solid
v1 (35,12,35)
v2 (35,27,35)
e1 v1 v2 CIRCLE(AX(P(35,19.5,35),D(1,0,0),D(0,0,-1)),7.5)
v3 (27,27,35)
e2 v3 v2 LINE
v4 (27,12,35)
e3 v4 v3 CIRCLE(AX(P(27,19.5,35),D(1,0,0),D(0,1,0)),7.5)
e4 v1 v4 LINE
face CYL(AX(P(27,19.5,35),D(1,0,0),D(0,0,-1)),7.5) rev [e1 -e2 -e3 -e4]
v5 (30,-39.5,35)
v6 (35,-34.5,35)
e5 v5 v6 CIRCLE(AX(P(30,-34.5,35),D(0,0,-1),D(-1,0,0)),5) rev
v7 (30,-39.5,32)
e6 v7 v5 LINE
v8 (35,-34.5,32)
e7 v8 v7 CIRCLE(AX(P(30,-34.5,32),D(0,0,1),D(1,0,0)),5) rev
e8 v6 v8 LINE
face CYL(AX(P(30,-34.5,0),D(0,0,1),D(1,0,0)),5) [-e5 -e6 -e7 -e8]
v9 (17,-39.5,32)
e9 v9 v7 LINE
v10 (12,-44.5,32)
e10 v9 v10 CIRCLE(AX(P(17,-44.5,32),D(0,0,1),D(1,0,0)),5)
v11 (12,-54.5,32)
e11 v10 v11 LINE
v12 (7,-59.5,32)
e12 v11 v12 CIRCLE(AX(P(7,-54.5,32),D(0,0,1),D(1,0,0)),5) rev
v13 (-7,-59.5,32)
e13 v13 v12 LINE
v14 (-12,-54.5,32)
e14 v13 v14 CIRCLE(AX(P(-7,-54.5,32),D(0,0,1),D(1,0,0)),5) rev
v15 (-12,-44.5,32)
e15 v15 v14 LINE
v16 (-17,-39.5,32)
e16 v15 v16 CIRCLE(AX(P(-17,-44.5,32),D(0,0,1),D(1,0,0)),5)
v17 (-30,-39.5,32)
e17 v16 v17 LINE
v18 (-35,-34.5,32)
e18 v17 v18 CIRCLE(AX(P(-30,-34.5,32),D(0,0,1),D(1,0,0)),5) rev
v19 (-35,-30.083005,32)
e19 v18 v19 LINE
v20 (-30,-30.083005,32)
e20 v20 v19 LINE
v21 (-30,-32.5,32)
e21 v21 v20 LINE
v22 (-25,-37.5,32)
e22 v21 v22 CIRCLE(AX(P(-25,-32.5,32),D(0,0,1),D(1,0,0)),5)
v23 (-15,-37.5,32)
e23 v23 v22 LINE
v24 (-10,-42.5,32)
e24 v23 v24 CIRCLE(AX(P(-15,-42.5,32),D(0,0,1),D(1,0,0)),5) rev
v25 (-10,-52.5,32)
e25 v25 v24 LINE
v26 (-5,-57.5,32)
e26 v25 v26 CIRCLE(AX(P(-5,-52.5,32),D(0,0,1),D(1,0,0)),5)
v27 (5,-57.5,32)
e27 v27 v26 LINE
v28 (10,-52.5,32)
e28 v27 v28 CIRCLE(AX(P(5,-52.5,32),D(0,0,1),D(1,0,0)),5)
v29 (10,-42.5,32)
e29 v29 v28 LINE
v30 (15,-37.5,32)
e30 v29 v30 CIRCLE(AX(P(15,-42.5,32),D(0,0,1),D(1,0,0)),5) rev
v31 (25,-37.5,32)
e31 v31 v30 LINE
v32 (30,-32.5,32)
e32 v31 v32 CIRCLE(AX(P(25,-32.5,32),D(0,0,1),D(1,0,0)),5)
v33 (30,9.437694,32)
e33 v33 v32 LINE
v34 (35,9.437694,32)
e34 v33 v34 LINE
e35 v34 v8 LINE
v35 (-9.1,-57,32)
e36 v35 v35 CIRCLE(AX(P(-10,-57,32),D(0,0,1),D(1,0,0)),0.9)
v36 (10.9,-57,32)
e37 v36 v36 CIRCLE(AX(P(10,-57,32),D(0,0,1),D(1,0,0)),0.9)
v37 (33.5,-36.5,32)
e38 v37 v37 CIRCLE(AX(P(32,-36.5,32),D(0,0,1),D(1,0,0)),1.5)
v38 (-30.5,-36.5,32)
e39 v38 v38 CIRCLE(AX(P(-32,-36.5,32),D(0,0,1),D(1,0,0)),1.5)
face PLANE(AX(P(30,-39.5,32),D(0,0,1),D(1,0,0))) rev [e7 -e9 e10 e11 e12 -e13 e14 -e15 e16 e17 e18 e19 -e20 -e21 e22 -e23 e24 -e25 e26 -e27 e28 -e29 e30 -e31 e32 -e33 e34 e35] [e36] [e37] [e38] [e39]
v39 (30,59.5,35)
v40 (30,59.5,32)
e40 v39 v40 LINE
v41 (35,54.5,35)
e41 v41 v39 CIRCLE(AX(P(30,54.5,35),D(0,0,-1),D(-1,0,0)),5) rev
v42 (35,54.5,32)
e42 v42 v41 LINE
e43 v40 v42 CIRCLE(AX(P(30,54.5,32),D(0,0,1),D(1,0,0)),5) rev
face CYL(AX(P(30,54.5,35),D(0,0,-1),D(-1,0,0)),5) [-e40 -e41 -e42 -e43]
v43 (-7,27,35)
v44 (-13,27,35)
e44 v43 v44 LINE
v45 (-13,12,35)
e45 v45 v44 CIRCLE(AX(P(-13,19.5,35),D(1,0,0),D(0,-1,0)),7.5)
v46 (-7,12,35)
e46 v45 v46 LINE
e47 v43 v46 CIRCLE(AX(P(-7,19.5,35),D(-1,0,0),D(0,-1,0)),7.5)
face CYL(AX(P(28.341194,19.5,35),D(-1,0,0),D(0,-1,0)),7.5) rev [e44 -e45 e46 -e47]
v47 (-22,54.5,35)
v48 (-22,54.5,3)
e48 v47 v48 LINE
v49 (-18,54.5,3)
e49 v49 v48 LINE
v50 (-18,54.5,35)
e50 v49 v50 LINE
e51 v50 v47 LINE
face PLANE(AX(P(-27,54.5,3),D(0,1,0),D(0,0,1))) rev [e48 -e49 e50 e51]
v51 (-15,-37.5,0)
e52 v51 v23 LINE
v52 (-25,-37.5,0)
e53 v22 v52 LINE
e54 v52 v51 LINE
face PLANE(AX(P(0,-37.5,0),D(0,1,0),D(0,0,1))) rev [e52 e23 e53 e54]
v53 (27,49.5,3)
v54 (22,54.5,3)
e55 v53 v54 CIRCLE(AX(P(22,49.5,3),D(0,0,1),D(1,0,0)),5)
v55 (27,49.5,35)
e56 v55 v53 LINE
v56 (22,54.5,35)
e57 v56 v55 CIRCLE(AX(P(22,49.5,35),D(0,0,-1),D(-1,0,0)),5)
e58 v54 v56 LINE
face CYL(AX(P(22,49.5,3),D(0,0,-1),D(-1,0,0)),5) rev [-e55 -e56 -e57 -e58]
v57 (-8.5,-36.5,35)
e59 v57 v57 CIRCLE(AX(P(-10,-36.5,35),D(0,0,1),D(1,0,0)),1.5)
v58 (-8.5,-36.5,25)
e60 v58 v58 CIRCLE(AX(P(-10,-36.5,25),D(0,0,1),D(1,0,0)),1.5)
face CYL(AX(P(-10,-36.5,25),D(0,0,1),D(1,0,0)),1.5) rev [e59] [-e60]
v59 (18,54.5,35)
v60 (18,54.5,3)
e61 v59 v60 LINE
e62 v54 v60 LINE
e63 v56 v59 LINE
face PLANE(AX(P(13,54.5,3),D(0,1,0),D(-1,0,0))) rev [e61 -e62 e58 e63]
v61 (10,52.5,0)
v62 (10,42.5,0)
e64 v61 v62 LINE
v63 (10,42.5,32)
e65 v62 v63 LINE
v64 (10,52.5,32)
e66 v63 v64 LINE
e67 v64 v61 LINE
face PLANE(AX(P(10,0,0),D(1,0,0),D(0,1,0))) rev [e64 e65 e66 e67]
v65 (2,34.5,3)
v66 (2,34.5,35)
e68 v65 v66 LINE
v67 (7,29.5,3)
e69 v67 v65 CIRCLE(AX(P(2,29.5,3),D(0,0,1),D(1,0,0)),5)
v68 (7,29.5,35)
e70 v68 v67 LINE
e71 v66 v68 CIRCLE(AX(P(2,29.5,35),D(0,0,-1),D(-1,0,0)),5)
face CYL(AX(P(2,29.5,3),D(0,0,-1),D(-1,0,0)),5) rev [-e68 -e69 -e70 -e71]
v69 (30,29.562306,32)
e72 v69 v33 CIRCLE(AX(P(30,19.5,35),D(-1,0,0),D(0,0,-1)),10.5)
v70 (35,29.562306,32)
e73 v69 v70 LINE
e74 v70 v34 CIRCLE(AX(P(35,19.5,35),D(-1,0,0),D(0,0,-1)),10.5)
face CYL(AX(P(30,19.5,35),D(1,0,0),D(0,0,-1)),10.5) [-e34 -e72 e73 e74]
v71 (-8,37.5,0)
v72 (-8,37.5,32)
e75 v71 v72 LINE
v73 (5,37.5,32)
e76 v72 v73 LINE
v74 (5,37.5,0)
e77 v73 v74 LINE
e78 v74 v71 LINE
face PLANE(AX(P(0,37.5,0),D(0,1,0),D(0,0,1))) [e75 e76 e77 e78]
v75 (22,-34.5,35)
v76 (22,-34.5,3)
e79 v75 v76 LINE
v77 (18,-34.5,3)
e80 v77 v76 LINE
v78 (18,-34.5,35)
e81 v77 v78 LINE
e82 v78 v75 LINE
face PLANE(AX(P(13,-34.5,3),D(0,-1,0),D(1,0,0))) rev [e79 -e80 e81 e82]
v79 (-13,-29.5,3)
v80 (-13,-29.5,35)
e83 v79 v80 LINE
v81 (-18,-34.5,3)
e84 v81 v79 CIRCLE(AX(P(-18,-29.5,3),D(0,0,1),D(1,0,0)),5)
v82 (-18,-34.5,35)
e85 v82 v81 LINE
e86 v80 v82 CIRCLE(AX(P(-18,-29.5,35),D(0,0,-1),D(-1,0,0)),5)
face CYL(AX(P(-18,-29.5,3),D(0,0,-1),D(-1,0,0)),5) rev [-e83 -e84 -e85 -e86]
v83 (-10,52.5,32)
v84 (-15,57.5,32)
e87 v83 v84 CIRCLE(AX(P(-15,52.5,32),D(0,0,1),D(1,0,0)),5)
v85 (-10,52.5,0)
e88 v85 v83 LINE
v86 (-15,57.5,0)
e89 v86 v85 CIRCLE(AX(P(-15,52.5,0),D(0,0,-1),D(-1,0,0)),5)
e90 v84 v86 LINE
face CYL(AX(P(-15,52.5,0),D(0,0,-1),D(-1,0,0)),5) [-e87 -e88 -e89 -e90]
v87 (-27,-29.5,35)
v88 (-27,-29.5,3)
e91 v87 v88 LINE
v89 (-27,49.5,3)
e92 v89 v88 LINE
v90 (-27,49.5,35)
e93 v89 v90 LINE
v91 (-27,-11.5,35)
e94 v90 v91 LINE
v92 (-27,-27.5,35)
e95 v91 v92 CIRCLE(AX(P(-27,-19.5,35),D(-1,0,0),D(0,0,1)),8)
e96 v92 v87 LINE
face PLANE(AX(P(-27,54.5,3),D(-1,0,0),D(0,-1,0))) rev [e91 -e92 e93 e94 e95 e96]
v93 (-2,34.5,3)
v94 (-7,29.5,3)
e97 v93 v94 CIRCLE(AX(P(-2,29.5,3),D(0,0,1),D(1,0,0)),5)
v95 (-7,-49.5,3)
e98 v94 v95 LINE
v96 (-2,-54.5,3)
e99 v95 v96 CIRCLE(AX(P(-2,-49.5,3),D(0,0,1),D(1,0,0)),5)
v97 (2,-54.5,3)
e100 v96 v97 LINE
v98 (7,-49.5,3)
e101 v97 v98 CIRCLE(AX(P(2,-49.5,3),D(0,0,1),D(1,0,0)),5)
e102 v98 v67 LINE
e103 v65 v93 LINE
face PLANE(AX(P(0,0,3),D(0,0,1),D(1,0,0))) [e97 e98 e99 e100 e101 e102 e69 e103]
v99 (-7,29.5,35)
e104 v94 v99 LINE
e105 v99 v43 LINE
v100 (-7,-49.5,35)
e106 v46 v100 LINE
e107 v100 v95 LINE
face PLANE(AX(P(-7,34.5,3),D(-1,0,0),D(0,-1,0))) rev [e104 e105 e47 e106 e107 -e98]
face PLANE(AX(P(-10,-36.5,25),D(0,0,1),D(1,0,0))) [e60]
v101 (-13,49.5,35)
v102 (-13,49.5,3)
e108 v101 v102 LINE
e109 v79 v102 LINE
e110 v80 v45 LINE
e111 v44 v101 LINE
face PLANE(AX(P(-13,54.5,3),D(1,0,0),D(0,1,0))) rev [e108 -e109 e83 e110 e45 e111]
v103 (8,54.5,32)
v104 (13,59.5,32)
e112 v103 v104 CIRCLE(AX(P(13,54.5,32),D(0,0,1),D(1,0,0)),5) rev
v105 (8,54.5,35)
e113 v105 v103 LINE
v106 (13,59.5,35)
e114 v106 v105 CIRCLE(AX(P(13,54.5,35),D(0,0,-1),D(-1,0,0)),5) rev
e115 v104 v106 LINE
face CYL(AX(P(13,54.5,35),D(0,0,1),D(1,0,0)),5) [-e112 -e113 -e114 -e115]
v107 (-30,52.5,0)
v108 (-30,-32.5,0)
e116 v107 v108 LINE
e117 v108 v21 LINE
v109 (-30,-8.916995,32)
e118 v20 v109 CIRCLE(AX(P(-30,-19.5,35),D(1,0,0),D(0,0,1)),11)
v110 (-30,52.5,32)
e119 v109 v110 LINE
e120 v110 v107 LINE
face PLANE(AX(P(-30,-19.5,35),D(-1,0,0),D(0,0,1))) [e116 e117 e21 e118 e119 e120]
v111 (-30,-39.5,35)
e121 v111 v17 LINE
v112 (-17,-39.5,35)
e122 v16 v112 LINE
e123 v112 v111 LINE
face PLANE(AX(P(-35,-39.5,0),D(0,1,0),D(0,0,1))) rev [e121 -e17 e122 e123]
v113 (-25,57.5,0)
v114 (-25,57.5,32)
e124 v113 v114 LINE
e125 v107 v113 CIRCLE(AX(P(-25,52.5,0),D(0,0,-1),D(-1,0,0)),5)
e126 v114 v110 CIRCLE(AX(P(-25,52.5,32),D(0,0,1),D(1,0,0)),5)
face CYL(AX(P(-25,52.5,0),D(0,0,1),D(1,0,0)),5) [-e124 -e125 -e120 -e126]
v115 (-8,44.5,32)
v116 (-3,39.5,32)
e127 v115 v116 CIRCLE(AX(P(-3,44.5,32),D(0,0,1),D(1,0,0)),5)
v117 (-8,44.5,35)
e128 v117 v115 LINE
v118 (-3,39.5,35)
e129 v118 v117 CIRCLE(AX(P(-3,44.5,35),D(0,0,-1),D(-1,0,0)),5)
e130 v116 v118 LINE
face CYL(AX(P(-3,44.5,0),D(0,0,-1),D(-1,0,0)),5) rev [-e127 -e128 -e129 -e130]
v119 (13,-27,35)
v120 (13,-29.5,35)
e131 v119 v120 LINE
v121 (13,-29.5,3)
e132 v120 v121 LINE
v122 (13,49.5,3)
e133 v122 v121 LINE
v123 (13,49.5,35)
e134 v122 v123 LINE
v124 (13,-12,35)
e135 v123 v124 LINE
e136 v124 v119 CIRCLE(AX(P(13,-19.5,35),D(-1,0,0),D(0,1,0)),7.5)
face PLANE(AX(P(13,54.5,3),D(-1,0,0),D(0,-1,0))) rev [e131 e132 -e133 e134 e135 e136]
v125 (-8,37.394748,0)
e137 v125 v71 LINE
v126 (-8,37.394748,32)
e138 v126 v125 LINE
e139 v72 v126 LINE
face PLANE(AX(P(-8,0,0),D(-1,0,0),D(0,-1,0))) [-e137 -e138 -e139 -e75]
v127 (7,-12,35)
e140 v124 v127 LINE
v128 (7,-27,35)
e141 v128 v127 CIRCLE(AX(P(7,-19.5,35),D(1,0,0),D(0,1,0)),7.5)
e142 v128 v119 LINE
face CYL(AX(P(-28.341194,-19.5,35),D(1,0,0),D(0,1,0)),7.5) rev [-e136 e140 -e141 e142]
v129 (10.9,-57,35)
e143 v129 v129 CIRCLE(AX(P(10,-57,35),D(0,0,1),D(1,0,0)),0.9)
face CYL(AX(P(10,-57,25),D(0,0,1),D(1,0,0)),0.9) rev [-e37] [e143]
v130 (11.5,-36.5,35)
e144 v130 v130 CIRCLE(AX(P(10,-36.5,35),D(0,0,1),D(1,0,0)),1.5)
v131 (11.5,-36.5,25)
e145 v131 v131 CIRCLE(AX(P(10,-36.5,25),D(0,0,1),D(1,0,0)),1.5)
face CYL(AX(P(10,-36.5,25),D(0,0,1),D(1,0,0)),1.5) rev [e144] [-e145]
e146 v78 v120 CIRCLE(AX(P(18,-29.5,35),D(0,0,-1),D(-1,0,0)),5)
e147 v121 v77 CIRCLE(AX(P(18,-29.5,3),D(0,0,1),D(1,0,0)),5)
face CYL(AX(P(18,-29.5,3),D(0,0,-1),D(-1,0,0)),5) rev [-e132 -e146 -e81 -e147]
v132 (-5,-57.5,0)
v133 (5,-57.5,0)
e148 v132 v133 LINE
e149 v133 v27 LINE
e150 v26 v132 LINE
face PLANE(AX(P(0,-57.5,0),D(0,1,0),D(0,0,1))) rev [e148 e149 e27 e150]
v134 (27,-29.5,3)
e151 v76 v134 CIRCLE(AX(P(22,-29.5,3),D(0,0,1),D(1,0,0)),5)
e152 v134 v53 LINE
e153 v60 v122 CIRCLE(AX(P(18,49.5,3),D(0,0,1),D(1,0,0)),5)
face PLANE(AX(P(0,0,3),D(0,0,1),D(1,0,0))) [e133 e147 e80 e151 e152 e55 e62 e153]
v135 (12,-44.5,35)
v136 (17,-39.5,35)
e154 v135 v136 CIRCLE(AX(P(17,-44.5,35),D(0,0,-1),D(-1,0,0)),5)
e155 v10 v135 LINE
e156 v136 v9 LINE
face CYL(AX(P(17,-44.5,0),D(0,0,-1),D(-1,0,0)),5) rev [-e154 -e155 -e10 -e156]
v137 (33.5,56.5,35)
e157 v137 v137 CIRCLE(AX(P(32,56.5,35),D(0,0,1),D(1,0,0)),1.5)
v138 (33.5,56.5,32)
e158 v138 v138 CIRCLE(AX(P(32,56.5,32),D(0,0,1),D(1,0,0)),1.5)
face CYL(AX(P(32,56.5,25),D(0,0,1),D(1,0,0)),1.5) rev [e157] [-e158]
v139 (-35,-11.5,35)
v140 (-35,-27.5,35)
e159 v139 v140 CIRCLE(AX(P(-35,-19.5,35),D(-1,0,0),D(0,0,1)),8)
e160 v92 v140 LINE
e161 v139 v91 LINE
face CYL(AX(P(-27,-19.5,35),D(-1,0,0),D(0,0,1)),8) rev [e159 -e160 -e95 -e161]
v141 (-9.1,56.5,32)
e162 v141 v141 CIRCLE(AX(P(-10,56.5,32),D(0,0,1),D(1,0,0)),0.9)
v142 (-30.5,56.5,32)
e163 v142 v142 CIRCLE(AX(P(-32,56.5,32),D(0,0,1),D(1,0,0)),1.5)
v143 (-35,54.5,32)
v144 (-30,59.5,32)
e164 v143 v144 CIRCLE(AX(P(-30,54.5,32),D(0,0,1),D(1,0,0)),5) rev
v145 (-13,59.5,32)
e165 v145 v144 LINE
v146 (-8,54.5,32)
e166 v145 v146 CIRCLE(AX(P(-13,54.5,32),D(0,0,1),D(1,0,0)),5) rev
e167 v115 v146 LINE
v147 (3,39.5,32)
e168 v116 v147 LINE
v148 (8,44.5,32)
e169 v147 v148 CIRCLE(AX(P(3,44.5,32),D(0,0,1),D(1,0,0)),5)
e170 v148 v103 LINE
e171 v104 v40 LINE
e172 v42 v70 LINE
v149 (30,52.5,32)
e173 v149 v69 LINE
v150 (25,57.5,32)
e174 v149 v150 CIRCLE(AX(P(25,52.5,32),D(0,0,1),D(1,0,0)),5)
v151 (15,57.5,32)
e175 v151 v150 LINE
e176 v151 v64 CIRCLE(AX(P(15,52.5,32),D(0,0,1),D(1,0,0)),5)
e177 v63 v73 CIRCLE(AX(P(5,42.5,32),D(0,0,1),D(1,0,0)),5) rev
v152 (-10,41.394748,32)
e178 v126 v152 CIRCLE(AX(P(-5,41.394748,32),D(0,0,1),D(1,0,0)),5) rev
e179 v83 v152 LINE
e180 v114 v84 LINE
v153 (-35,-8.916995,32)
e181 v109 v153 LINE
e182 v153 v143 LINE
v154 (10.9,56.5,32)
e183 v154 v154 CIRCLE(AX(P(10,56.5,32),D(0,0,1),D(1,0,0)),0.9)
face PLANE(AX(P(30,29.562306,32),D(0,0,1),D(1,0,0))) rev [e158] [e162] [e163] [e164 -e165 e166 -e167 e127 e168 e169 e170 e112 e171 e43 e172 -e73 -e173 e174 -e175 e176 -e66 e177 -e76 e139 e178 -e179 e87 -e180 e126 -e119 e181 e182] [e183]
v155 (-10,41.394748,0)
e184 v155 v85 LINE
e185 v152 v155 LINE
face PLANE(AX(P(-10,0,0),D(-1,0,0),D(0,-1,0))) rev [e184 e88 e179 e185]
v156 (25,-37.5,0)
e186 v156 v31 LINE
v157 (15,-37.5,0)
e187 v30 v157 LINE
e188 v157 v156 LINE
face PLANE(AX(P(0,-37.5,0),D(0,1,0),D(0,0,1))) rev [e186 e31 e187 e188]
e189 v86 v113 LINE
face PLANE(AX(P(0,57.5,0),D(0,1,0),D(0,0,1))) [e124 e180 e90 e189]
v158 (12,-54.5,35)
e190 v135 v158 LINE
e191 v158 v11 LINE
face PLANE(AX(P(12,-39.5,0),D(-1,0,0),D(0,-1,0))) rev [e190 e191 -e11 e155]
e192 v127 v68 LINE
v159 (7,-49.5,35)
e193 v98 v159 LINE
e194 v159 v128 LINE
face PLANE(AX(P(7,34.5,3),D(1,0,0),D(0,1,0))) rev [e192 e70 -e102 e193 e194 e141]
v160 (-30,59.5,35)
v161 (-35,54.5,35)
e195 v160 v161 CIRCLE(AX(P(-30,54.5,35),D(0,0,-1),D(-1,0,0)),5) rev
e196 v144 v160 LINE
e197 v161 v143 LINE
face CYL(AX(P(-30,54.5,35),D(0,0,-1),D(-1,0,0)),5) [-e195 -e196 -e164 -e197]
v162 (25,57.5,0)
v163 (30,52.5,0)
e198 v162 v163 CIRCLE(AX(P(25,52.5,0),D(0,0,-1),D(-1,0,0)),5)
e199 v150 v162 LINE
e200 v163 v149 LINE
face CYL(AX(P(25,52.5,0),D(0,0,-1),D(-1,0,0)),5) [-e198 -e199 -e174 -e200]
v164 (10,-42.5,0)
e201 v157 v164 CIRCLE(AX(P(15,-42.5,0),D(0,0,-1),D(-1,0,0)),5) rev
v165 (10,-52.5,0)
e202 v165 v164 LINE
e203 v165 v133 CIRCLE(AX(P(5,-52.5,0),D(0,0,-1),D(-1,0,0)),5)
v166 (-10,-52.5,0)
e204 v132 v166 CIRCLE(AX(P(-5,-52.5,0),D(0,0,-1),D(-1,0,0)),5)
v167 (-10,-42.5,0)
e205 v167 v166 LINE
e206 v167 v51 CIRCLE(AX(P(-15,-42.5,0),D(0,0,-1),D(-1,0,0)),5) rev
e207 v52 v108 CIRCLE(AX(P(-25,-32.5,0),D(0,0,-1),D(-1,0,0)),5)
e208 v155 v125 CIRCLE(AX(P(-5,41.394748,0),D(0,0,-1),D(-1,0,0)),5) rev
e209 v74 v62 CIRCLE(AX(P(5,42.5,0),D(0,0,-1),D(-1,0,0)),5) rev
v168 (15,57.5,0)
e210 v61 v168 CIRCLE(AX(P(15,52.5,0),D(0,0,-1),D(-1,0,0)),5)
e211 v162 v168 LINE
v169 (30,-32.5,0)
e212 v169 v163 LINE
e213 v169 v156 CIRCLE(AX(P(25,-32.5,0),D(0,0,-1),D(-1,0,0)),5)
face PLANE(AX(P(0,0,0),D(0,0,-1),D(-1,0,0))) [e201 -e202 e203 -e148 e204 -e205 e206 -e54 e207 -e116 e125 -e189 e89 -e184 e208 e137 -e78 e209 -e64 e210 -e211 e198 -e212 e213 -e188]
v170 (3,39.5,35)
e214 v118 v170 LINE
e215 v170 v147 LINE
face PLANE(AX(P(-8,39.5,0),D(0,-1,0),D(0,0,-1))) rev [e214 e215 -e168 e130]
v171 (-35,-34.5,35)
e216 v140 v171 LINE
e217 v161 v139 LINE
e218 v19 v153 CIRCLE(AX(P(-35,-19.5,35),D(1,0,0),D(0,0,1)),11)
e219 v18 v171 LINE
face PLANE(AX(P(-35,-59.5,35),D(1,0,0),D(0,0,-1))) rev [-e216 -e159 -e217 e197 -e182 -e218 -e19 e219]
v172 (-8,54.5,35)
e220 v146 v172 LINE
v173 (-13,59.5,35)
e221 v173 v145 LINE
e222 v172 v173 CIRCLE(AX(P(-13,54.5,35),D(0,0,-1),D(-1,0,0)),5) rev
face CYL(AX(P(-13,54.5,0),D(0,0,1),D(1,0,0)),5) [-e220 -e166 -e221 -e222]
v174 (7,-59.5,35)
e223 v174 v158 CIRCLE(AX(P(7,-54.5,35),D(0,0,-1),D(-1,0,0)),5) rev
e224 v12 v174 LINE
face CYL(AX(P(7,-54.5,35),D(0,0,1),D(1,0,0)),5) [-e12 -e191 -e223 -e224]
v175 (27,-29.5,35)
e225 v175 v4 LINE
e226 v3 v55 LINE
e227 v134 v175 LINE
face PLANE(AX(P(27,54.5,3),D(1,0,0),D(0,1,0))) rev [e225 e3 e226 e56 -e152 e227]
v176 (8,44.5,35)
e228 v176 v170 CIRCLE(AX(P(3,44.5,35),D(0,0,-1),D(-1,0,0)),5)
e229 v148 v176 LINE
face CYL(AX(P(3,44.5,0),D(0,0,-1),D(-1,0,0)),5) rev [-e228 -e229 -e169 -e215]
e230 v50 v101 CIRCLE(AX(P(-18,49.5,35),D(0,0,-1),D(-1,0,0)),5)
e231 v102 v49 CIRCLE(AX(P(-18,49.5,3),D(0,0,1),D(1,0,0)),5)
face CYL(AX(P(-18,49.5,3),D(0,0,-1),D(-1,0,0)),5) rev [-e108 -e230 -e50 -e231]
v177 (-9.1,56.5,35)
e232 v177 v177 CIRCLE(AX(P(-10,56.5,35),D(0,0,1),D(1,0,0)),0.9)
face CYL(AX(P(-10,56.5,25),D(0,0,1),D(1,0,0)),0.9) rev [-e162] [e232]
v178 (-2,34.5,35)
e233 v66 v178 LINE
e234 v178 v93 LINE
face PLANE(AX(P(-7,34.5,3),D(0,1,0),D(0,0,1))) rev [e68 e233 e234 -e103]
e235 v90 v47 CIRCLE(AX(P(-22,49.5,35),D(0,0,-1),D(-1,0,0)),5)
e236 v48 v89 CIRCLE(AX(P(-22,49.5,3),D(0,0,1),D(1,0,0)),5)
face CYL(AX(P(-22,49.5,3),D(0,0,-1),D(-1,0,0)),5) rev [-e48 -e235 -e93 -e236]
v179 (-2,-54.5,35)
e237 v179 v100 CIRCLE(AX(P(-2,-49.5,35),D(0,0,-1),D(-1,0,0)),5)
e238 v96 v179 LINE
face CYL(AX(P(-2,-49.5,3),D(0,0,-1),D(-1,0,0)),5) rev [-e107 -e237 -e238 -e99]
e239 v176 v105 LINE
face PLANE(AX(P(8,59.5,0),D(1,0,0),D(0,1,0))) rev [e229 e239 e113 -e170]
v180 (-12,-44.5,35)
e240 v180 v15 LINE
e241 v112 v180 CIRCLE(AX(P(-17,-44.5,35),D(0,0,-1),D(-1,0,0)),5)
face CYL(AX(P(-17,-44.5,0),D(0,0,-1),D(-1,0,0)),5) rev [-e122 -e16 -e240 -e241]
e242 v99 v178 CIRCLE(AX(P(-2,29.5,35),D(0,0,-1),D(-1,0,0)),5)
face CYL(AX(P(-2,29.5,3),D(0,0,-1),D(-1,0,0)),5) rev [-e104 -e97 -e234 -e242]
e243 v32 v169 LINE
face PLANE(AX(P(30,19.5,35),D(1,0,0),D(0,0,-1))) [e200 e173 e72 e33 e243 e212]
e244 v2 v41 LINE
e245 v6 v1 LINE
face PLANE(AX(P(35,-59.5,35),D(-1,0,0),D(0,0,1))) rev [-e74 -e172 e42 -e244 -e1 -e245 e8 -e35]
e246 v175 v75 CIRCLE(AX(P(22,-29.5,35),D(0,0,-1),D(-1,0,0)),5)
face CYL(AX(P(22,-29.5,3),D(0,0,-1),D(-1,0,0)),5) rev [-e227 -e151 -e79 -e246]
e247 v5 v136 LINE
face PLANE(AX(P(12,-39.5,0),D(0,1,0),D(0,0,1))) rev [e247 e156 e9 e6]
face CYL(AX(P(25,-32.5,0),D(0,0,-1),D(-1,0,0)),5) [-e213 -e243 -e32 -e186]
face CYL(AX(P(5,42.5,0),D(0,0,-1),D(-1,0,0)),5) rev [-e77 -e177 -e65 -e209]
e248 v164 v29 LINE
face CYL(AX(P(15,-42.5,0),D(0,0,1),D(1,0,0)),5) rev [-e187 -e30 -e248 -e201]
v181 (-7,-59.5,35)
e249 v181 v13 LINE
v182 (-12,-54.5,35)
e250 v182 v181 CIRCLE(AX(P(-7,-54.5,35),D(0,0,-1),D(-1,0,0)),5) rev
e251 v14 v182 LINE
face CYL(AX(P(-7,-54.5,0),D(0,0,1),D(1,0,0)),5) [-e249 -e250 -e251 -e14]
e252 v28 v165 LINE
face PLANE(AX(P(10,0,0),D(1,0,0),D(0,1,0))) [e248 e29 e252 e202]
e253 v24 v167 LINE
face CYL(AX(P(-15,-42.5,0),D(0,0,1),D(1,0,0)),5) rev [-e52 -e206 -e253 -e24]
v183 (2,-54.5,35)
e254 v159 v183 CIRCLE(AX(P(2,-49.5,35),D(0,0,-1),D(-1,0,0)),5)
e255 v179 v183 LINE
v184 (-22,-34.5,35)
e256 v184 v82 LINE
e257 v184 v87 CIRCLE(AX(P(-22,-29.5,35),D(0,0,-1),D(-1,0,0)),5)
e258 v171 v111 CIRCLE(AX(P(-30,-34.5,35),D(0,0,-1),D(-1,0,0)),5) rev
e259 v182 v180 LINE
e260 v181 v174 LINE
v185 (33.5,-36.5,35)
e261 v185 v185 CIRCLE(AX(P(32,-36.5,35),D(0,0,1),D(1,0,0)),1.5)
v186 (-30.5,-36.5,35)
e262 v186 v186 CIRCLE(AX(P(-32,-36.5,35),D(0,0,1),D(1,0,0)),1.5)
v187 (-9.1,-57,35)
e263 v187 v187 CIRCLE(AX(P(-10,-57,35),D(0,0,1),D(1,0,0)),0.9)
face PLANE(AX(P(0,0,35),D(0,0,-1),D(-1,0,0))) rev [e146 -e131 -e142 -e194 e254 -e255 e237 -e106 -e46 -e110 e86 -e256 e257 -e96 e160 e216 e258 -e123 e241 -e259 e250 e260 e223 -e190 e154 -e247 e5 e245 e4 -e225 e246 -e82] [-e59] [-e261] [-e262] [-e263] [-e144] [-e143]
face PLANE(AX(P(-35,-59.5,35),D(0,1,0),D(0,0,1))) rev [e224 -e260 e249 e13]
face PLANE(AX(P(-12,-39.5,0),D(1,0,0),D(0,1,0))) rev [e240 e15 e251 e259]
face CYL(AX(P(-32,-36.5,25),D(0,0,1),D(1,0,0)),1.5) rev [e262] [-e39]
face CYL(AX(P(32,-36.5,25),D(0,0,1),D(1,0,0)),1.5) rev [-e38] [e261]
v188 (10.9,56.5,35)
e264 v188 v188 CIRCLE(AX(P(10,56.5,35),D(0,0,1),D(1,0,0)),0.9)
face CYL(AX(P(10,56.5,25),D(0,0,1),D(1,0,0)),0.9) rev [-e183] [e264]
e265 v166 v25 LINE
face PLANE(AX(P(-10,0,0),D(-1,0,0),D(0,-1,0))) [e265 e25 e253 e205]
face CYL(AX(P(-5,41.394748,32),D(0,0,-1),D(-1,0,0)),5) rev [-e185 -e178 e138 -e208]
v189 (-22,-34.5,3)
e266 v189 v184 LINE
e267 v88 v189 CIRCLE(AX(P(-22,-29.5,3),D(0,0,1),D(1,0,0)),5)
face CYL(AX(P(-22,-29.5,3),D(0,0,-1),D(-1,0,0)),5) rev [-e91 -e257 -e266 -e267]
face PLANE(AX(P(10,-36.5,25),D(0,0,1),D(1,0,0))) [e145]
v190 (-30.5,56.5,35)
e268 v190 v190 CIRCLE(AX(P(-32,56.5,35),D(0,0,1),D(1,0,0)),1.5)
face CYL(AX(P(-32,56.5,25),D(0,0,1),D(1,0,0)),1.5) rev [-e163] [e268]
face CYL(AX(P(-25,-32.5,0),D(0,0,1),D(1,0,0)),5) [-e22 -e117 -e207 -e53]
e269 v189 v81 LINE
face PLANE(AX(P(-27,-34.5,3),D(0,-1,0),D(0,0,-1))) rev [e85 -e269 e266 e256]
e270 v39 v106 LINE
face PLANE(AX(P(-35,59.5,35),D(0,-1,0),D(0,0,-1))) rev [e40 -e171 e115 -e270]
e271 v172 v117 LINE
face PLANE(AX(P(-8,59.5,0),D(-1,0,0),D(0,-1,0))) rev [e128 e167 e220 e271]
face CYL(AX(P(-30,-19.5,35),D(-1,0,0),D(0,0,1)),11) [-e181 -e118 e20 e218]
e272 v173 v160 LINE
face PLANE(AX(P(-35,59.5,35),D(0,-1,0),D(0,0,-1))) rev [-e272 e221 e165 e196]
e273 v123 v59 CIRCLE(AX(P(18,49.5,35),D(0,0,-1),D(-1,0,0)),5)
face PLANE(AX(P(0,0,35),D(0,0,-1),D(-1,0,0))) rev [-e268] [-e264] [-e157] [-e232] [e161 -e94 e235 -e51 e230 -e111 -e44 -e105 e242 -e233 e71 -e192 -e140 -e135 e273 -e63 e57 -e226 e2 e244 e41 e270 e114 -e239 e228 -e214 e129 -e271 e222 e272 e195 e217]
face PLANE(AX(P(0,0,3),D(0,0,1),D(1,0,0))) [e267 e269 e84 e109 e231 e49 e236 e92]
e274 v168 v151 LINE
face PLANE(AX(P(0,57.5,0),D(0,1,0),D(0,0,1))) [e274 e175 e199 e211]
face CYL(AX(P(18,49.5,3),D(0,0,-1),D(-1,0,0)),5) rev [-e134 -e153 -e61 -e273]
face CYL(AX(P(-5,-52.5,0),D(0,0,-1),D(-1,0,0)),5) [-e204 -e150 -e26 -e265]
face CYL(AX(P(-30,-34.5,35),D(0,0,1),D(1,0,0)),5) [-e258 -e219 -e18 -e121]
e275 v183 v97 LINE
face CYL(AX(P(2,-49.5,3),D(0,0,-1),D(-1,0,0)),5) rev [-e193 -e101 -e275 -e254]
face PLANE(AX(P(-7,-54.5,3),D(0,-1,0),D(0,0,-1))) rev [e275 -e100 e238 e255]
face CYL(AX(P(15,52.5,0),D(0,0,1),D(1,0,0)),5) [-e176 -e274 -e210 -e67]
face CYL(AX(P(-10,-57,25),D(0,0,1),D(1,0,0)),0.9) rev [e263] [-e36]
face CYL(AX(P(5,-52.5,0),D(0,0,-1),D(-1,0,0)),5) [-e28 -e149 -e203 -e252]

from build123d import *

# Parameters (mm, degrees)
SKETCH1_W           = 70
SKETCH1_H           = 119
BOSS_EXTRUDE1_DEPTH = 35
SKETCH2_R           = 8
CUT_EXTRUDE1_DEPTH  = 8
CUT_EXTRUDE2_DEPTH  = 32
SKETCH4_R           = 7.5
CUT_EXTRUDE3_DEPTH  = 8
SKETCH5_W           = 16
SKETCH5_H           = 20
SKETCH5_W_2         = 23
CUT_EXTRUDE4_DEPTH  = 78.396705356
CUT_EXTRUDE5_DEPTH  = 5
SKETCH7_W           = 18
SKETCH7_H           = 32
CUT_EXTRUDE6_DEPTH  = 2
SKETCH8_W           = 32
SKETCH8_H           = 22
CUT_EXTRUDE7_DEPTH  = 2
SKETCH9_W           = 22
SKETCH9_H           = 32
CUT_EXTRUDE8_DEPTH  = 2
SKETCH10_W          = 32
SKETCH10_H          = 18
CUT_EXTRUDE9_DEPTH  = 2
CUT_EXTRUDE11_DEPTH = 5
SKETCH13_W          = 20
SKETCH13_H          = 32
CUT_EXTRUDE12_DEPTH = 2
SKETCH14_W          = 22
SKETCH14_H          = 32
CUT_EXTRUDE13_DEPTH = 2
SKETCH15_W          = 32
SKETCH15_H          = 18
CUT_EXTRUDE14_DEPTH = 2
SKETCH16_W          = 18
SKETCH16_H          = 32
CUT_EXTRUDE15_DEPTH = 2
SKETCH17_W          = 32
SKETCH17_H          = 20.10525169
CUT_EXTRUDE16_DEPTH = 2
FILLET1_R           = 5
FILLET3_R           = 5
FILLET4_R           = 5
SKETCH18_R          = 1.5
CUT_EXTRUDE17_DEPTH = 10
SKETCH19_R          = 0.9
CUT_EXTRUDE18_DEPTH = 10
BOSS_EXTRUDE3_DEPTH = 6
BOSS_EXTRUDE4_START = -6
BOSS_EXTRUDE4_DEPTH = 6


with BuildPart() as part:
    # Sketch1 → Boss-Extrude1 (new body)
    with BuildSketch(Plane.XY):
        Rectangle(SKETCH1_W, SKETCH1_H)
    extrude(amount=BOSS_EXTRUDE1_DEPTH)

    # Sketch2 → Cut-Extrude1 (cut)
    with BuildSketch(Plane.ZY.offset(35)):
        with Locations((35, -19.5)):
            Circle(SKETCH2_R)
    extrude(amount=-CUT_EXTRUDE1_DEPTH, mode=Mode.SUBTRACT)

    # Sketch3 → Cut-Extrude2 (cut)
    with BuildSketch(Plane.XY.offset(35)):
        Polygon((-27, 54.5), (-13, 54.5), (-13, 27), (-7, 27), (-7, 34.5), (7, 34.5), (7, -12), (13, -12), (13, 54.5), (27, 54.5), (27, -34.5), (13, -34.5), (13, -27), (7, -27), (7, -54.5), (-7, -54.5), (-7, 12), (-13, 12), (-13, -34.5), (-27, -34.5), align=None)
    extrude(amount=-CUT_EXTRUDE2_DEPTH, mode=Mode.SUBTRACT)

    # Sketch4 → Cut-Extrude3 (cut)
    with BuildSketch(Plane(origin=(35, 0, 0), x_dir=(0, 0, -1), z_dir=(1, 0, 0))):
        with Locations((-35, 19.5)):
            Circle(SKETCH4_R)
    extrude(amount=-CUT_EXTRUDE3_DEPTH, mode=Mode.SUBTRACT)

    # Sketch5 → Cut-Extrude4 (cut, through all)
    with BuildSketch(Plane.XY.offset(35)):
        with Locations((0, 49.5)):
            Rectangle(SKETCH5_W, SKETCH5_H)
        with Locations((23.5, -49.5)):
            Rectangle(SKETCH5_W_2, SKETCH5_H)
        with Locations((-23.5, -49.5)):
            Rectangle(SKETCH5_W_2, SKETCH5_H)
    extrude(amount=-CUT_EXTRUDE4_DEPTH, mode=Mode.SUBTRACT)

    # Sketch6 → Cut-Extrude5 (cut)
    with BuildSketch(Plane(origin=(35, 0, 0), x_dir=(0, 0, -1), z_dir=(1, 0, 0))):
        with BuildLine():
            Line((-32, 59.5), (0, 59.5))
            Line((0, 59.5), (0, -39.5))
            Line((0, -39.5), (-32, -39.5))
            Line((-32, -39.5), (-32, 9.437694101))
            ThreePointArc((-32, 9.437694101), (-24.5, 19.5), (-32, 29.562305899))
            Line((-32, 29.562305899), (-32, 59.5))
        make_face()
    extrude(amount=-CUT_EXTRUDE5_DEPTH, mode=Mode.SUBTRACT)

    # Sketch7 → Cut-Extrude6 (cut)
    with BuildSketch(Plane.XZ.offset(39.5)):
        with Locations((21, 16)):
            Rectangle(SKETCH7_W, SKETCH7_H)
    extrude(amount=-CUT_EXTRUDE6_DEPTH, mode=Mode.SUBTRACT)

    # Sketch8 → Cut-Extrude7 (cut)
    with BuildSketch(Plane(origin=(12, 0, 0), x_dir=(0, 0, -1), z_dir=(1, 0, 0))):
        with Locations((-16, -48.5)):
            Rectangle(SKETCH8_W, SKETCH8_H)
    extrude(amount=-CUT_EXTRUDE7_DEPTH, mode=Mode.SUBTRACT)

    # Sketch9 → Cut-Extrude8 (cut)
    with BuildSketch(Plane.XZ.offset(59.5)):
        with Locations((-1, 16)):
            Rectangle(SKETCH9_W, SKETCH9_H)
    extrude(amount=-CUT_EXTRUDE8_DEPTH, mode=Mode.SUBTRACT)

    # Sketch10 → Cut-Extrude9 (cut)
    with BuildSketch(Plane.ZY.offset(12)):
        with Locations((16, -48.5)):
            Rectangle(SKETCH10_W, SKETCH10_H)
    extrude(amount=-CUT_EXTRUDE9_DEPTH, mode=Mode.SUBTRACT)

    # Sketch12 → Cut-Extrude11 (cut)
    with BuildSketch(Plane.ZY.offset(35)):
        with BuildLine():
            Line((32, 59.5), (0, 59.5))
            Line((0, 59.5), (0, -39.5))
            Line((0, -39.5), (32, -39.5))
            Line((32, -39.5), (32, -30.083005244))
            ThreePointArc((32, -30.083005244), (24, -19.5), (32, -8.916994756))
            Line((32, -8.916994756), (32, 59.5))
        make_face()
    extrude(amount=-CUT_EXTRUDE11_DEPTH, mode=Mode.SUBTRACT)

    # Sketch13 → Cut-Extrude12 (cut)
    with BuildSketch(Plane.XZ.offset(39.5)):
        with Locations((-20, 16)):
            Rectangle(SKETCH13_W, SKETCH13_H)
    extrude(amount=-CUT_EXTRUDE12_DEPTH, mode=Mode.SUBTRACT)

    # Sketch14 → Cut-Extrude13 (cut)
    with BuildSketch(Plane(origin=(0, 59.5, 0), x_dir=(1, 0, 0), z_dir=(0, 1, 0))):
        with Locations((19, -16)):
            Rectangle(SKETCH14_W, SKETCH14_H)
        with Locations((-19, -16)):
            Rectangle(SKETCH14_W, SKETCH14_H)
    extrude(amount=-CUT_EXTRUDE13_DEPTH, mode=Mode.SUBTRACT)

    # Sketch15 → Cut-Extrude14 (cut)
    with BuildSketch(Plane.ZY.offset(-8)):
        with Locations((16, 48.5)):
            Rectangle(SKETCH15_W, SKETCH15_H)
    extrude(amount=-CUT_EXTRUDE14_DEPTH, mode=Mode.SUBTRACT)

    # Sketch16 → Cut-Extrude15 (cut)
    with BuildSketch(Plane(origin=(0, 39.5, 0), x_dir=(1, 0, 0), z_dir=(0, 1, 0))):
        with Locations((1, -16)):
            Rectangle(SKETCH16_W, SKETCH16_H)
    extrude(amount=-CUT_EXTRUDE15_DEPTH, mode=Mode.SUBTRACT)

    # Sketch17 → Cut-Extrude16 (cut)
    with BuildSketch(Plane(origin=(-8, 0, 0), x_dir=(0, 0, -1), z_dir=(1, 0, 0))):
        with Locations((-16, 47.447374155)):
            Rectangle(SKETCH17_W, SKETCH17_H)
    extrude(amount=-CUT_EXTRUDE16_DEPTH, mode=Mode.SUBTRACT)

    # Fillet1
    fillet1_edges = [part.edges().sort_by_distance(p)[0] for p in [
        (-27, -34.5, 19),
        (-27, 54.5, 19),
        (-13, 54.5, 19),
        (-7, 34.5, 19),
        (7, 34.5, 19),
        (13, 54.5, 19),
        (27, 54.5, 19),
        (27, -34.5, 19),
        (13, -34.5, 19),
        (7, -54.5, 19),
        (-7, -54.5, 19),
        (-13, -34.5, 19),
    ]]
    fillet(fillet1_edges, radius=FILLET1_R)

    # Fillet3
    # the kernel refuses this fillet: 5 mm, written as the material it adds along each edge
    with BuildSketch(Plane(origin=(-10, -37.5, 0), x_dir=(0, -1, 0), z_dir=(0, 0, 1))) as fillet3_piece_1:
        with BuildLine():
            CenterArc((FILLET3_R, -FILLET3_R), FILLET3_R, 90, 90)
            Line((0, -FILLET3_R), (0, 0))
            Line((0, 0), (FILLET3_R, 0))
        make_face()
    extrude(amount=32)
    with BuildSketch(Plane(origin=(10, -37.5, 32), x_dir=(1, 0, 0), z_dir=(0, 0, -1)), Plane(origin=(10, 37.5, 0), x_dir=(0, 1, 0), z_dir=(0, 0, 1))) as fillet3_piece_2:
        with BuildLine():
            CenterArc((FILLET3_R, FILLET3_R), FILLET3_R, 180, 90)
            Line((0, FILLET3_R), (0, 0))
            Line((0, 0), (FILLET3_R, 0))
        make_face()
    extrude(amount=32)
    with BuildSketch(Plane(origin=(-10, 37.39474831, 32), x_dir=(1, 0, 0), z_dir=(0, 0, -1))) as fillet3_piece_3:
        with BuildLine():
            CenterArc((5, -4), FILLET3_R, 126.869897646, 53.130102354)
            Line((0, -4), (0, 0))
            Line((0, 0), (2, 0))
        make_face()
    extrude(amount=32)
    # the kernel refuses this fillet: 5 mm, written as the material it takes off along each edge
    with BuildSketch(Plane(origin=(-10, 57.5, -12.5), x_dir=(-1, 0, 0), z_dir=(0, 0, 1)), Plane(origin=(-30, -37.5, 32), x_dir=(0, 1, 0), z_dir=(0, 0, -1)), Plane(origin=(-10, -57.5, 32), x_dir=(0, 1, 0), z_dir=(0, 0, -1))) as fillet3_2_piece_1:
        with BuildLine():
            CenterArc((FILLET3_R, FILLET3_R), FILLET3_R, 180, 90)
            Line((0, FILLET3_R), (0, 0))
            Line((0, 0), (FILLET3_R, 0))
        make_face()
    extrude(amount=44.5, mode=Mode.SUBTRACT)
    with BuildSketch(Plane(origin=(-30, 57.5, 32), x_dir=(0, -1, 0), z_dir=(0, 0, -1)), Plane(origin=(30, -37.5, -12.5), x_dir=(-1, 0, 0), z_dir=(0, 0, 1)), Plane(origin=(30, 57.5, -12.5), x_dir=(0, -1, 0), z_dir=(0, 0, 1)), Plane(origin=(10, 57.5, 32), x_dir=(0, -1, 0), z_dir=(0, 0, -1)), Plane(origin=(10, -57.5, -12.5), x_dir=(-1, 0, 0), z_dir=(0, 0, 1))) as fillet3_2_piece_2:
        with BuildLine():
            CenterArc((FILLET3_R, -FILLET3_R), FILLET3_R, 90, 90)
            Line((0, -FILLET3_R), (0, 0))
            Line((0, 0), (FILLET3_R, 0))
        make_face()
    extrude(amount=44.5, mode=Mode.SUBTRACT)

    # Fillet4
    fillet4_edges = [part.edges().sort_by_distance(p)[0] for p in [
        (35, -39.5, 33.5),
        (12, -39.5, 33.5),
        (12, -59.5, 33.5),
        (-12, -59.5, 33.5),
        (-12, -39.5, 33.5),
        (-35, -39.5, 33.5),
        (8, 59.5, 33.5),
        (-8, 59.5, 33.5),
        (8, 39.5, 33.5),
        (-8, 39.5, 33.5),
        (-35, 59.5, 33.5),
        (35, 59.5, 33.5),
    ]]
    fillet(fillet4_edges, radius=FILLET4_R)

    # Sketch18 → Cut-Extrude17 (cut)
    with BuildSketch(Plane.XY.offset(35)):
        with Locations((-32, 56.5)):
            Circle(SKETCH18_R)
        with Locations((32, 56.5)):
            Circle(SKETCH18_R)
        with Locations((-32, -36.5)):
            Circle(SKETCH18_R)
        with Locations((-10, -36.5)):
            Circle(SKETCH18_R)
        with Locations((10, -36.5)):
            Circle(SKETCH18_R)
        with Locations((32, -36.5)):
            Circle(SKETCH18_R)
    extrude(amount=-CUT_EXTRUDE17_DEPTH, mode=Mode.SUBTRACT)

    # Sketch19 → Cut-Extrude18 (cut)
    with BuildSketch(Plane.XY.offset(35)):
        with Locations((-10, 56.5)):
            Circle(SKETCH19_R)
        with Locations((10, 56.5)):
            Circle(SKETCH19_R)
        with Locations((-10, -57)):
            Circle(SKETCH19_R)
        with Locations((10, -57)):
            Circle(SKETCH19_R)
    extrude(amount=-CUT_EXTRUDE18_DEPTH, mode=Mode.SUBTRACT)

    # Sketch20 → Boss-Extrude3 (add)
    with BuildSketch(Plane(origin=(13, 0, 0), x_dir=(0, 0, -1), z_dir=(1, 0, 0))):
        with BuildLine():
            Line((-35, -12), (-3, -12))
            Line((-3, -12), (-3, -27))
            Line((-3, -27), (-35, -27))
            ThreePointArc((-35, -27), (-27.5, -19.5), (-35, -12))
        make_face()
    extrude(amount=-BOSS_EXTRUDE3_DEPTH)

    # Sketch21 → Boss-Extrude4 (add)
    with BuildSketch(Plane.ZY.offset(13).offset(BOSS_EXTRUDE4_START)):
        with BuildLine():
            Line((35, 27), (3, 27))
            Line((3, 27), (3, 12))
            Line((3, 12), (35, 12))
            ThreePointArc((35, 12), (27.5, 19.5), (35, 27))
        make_face()
    extrude(amount=BOSS_EXTRUDE4_DEPTH)


solid = part.part
